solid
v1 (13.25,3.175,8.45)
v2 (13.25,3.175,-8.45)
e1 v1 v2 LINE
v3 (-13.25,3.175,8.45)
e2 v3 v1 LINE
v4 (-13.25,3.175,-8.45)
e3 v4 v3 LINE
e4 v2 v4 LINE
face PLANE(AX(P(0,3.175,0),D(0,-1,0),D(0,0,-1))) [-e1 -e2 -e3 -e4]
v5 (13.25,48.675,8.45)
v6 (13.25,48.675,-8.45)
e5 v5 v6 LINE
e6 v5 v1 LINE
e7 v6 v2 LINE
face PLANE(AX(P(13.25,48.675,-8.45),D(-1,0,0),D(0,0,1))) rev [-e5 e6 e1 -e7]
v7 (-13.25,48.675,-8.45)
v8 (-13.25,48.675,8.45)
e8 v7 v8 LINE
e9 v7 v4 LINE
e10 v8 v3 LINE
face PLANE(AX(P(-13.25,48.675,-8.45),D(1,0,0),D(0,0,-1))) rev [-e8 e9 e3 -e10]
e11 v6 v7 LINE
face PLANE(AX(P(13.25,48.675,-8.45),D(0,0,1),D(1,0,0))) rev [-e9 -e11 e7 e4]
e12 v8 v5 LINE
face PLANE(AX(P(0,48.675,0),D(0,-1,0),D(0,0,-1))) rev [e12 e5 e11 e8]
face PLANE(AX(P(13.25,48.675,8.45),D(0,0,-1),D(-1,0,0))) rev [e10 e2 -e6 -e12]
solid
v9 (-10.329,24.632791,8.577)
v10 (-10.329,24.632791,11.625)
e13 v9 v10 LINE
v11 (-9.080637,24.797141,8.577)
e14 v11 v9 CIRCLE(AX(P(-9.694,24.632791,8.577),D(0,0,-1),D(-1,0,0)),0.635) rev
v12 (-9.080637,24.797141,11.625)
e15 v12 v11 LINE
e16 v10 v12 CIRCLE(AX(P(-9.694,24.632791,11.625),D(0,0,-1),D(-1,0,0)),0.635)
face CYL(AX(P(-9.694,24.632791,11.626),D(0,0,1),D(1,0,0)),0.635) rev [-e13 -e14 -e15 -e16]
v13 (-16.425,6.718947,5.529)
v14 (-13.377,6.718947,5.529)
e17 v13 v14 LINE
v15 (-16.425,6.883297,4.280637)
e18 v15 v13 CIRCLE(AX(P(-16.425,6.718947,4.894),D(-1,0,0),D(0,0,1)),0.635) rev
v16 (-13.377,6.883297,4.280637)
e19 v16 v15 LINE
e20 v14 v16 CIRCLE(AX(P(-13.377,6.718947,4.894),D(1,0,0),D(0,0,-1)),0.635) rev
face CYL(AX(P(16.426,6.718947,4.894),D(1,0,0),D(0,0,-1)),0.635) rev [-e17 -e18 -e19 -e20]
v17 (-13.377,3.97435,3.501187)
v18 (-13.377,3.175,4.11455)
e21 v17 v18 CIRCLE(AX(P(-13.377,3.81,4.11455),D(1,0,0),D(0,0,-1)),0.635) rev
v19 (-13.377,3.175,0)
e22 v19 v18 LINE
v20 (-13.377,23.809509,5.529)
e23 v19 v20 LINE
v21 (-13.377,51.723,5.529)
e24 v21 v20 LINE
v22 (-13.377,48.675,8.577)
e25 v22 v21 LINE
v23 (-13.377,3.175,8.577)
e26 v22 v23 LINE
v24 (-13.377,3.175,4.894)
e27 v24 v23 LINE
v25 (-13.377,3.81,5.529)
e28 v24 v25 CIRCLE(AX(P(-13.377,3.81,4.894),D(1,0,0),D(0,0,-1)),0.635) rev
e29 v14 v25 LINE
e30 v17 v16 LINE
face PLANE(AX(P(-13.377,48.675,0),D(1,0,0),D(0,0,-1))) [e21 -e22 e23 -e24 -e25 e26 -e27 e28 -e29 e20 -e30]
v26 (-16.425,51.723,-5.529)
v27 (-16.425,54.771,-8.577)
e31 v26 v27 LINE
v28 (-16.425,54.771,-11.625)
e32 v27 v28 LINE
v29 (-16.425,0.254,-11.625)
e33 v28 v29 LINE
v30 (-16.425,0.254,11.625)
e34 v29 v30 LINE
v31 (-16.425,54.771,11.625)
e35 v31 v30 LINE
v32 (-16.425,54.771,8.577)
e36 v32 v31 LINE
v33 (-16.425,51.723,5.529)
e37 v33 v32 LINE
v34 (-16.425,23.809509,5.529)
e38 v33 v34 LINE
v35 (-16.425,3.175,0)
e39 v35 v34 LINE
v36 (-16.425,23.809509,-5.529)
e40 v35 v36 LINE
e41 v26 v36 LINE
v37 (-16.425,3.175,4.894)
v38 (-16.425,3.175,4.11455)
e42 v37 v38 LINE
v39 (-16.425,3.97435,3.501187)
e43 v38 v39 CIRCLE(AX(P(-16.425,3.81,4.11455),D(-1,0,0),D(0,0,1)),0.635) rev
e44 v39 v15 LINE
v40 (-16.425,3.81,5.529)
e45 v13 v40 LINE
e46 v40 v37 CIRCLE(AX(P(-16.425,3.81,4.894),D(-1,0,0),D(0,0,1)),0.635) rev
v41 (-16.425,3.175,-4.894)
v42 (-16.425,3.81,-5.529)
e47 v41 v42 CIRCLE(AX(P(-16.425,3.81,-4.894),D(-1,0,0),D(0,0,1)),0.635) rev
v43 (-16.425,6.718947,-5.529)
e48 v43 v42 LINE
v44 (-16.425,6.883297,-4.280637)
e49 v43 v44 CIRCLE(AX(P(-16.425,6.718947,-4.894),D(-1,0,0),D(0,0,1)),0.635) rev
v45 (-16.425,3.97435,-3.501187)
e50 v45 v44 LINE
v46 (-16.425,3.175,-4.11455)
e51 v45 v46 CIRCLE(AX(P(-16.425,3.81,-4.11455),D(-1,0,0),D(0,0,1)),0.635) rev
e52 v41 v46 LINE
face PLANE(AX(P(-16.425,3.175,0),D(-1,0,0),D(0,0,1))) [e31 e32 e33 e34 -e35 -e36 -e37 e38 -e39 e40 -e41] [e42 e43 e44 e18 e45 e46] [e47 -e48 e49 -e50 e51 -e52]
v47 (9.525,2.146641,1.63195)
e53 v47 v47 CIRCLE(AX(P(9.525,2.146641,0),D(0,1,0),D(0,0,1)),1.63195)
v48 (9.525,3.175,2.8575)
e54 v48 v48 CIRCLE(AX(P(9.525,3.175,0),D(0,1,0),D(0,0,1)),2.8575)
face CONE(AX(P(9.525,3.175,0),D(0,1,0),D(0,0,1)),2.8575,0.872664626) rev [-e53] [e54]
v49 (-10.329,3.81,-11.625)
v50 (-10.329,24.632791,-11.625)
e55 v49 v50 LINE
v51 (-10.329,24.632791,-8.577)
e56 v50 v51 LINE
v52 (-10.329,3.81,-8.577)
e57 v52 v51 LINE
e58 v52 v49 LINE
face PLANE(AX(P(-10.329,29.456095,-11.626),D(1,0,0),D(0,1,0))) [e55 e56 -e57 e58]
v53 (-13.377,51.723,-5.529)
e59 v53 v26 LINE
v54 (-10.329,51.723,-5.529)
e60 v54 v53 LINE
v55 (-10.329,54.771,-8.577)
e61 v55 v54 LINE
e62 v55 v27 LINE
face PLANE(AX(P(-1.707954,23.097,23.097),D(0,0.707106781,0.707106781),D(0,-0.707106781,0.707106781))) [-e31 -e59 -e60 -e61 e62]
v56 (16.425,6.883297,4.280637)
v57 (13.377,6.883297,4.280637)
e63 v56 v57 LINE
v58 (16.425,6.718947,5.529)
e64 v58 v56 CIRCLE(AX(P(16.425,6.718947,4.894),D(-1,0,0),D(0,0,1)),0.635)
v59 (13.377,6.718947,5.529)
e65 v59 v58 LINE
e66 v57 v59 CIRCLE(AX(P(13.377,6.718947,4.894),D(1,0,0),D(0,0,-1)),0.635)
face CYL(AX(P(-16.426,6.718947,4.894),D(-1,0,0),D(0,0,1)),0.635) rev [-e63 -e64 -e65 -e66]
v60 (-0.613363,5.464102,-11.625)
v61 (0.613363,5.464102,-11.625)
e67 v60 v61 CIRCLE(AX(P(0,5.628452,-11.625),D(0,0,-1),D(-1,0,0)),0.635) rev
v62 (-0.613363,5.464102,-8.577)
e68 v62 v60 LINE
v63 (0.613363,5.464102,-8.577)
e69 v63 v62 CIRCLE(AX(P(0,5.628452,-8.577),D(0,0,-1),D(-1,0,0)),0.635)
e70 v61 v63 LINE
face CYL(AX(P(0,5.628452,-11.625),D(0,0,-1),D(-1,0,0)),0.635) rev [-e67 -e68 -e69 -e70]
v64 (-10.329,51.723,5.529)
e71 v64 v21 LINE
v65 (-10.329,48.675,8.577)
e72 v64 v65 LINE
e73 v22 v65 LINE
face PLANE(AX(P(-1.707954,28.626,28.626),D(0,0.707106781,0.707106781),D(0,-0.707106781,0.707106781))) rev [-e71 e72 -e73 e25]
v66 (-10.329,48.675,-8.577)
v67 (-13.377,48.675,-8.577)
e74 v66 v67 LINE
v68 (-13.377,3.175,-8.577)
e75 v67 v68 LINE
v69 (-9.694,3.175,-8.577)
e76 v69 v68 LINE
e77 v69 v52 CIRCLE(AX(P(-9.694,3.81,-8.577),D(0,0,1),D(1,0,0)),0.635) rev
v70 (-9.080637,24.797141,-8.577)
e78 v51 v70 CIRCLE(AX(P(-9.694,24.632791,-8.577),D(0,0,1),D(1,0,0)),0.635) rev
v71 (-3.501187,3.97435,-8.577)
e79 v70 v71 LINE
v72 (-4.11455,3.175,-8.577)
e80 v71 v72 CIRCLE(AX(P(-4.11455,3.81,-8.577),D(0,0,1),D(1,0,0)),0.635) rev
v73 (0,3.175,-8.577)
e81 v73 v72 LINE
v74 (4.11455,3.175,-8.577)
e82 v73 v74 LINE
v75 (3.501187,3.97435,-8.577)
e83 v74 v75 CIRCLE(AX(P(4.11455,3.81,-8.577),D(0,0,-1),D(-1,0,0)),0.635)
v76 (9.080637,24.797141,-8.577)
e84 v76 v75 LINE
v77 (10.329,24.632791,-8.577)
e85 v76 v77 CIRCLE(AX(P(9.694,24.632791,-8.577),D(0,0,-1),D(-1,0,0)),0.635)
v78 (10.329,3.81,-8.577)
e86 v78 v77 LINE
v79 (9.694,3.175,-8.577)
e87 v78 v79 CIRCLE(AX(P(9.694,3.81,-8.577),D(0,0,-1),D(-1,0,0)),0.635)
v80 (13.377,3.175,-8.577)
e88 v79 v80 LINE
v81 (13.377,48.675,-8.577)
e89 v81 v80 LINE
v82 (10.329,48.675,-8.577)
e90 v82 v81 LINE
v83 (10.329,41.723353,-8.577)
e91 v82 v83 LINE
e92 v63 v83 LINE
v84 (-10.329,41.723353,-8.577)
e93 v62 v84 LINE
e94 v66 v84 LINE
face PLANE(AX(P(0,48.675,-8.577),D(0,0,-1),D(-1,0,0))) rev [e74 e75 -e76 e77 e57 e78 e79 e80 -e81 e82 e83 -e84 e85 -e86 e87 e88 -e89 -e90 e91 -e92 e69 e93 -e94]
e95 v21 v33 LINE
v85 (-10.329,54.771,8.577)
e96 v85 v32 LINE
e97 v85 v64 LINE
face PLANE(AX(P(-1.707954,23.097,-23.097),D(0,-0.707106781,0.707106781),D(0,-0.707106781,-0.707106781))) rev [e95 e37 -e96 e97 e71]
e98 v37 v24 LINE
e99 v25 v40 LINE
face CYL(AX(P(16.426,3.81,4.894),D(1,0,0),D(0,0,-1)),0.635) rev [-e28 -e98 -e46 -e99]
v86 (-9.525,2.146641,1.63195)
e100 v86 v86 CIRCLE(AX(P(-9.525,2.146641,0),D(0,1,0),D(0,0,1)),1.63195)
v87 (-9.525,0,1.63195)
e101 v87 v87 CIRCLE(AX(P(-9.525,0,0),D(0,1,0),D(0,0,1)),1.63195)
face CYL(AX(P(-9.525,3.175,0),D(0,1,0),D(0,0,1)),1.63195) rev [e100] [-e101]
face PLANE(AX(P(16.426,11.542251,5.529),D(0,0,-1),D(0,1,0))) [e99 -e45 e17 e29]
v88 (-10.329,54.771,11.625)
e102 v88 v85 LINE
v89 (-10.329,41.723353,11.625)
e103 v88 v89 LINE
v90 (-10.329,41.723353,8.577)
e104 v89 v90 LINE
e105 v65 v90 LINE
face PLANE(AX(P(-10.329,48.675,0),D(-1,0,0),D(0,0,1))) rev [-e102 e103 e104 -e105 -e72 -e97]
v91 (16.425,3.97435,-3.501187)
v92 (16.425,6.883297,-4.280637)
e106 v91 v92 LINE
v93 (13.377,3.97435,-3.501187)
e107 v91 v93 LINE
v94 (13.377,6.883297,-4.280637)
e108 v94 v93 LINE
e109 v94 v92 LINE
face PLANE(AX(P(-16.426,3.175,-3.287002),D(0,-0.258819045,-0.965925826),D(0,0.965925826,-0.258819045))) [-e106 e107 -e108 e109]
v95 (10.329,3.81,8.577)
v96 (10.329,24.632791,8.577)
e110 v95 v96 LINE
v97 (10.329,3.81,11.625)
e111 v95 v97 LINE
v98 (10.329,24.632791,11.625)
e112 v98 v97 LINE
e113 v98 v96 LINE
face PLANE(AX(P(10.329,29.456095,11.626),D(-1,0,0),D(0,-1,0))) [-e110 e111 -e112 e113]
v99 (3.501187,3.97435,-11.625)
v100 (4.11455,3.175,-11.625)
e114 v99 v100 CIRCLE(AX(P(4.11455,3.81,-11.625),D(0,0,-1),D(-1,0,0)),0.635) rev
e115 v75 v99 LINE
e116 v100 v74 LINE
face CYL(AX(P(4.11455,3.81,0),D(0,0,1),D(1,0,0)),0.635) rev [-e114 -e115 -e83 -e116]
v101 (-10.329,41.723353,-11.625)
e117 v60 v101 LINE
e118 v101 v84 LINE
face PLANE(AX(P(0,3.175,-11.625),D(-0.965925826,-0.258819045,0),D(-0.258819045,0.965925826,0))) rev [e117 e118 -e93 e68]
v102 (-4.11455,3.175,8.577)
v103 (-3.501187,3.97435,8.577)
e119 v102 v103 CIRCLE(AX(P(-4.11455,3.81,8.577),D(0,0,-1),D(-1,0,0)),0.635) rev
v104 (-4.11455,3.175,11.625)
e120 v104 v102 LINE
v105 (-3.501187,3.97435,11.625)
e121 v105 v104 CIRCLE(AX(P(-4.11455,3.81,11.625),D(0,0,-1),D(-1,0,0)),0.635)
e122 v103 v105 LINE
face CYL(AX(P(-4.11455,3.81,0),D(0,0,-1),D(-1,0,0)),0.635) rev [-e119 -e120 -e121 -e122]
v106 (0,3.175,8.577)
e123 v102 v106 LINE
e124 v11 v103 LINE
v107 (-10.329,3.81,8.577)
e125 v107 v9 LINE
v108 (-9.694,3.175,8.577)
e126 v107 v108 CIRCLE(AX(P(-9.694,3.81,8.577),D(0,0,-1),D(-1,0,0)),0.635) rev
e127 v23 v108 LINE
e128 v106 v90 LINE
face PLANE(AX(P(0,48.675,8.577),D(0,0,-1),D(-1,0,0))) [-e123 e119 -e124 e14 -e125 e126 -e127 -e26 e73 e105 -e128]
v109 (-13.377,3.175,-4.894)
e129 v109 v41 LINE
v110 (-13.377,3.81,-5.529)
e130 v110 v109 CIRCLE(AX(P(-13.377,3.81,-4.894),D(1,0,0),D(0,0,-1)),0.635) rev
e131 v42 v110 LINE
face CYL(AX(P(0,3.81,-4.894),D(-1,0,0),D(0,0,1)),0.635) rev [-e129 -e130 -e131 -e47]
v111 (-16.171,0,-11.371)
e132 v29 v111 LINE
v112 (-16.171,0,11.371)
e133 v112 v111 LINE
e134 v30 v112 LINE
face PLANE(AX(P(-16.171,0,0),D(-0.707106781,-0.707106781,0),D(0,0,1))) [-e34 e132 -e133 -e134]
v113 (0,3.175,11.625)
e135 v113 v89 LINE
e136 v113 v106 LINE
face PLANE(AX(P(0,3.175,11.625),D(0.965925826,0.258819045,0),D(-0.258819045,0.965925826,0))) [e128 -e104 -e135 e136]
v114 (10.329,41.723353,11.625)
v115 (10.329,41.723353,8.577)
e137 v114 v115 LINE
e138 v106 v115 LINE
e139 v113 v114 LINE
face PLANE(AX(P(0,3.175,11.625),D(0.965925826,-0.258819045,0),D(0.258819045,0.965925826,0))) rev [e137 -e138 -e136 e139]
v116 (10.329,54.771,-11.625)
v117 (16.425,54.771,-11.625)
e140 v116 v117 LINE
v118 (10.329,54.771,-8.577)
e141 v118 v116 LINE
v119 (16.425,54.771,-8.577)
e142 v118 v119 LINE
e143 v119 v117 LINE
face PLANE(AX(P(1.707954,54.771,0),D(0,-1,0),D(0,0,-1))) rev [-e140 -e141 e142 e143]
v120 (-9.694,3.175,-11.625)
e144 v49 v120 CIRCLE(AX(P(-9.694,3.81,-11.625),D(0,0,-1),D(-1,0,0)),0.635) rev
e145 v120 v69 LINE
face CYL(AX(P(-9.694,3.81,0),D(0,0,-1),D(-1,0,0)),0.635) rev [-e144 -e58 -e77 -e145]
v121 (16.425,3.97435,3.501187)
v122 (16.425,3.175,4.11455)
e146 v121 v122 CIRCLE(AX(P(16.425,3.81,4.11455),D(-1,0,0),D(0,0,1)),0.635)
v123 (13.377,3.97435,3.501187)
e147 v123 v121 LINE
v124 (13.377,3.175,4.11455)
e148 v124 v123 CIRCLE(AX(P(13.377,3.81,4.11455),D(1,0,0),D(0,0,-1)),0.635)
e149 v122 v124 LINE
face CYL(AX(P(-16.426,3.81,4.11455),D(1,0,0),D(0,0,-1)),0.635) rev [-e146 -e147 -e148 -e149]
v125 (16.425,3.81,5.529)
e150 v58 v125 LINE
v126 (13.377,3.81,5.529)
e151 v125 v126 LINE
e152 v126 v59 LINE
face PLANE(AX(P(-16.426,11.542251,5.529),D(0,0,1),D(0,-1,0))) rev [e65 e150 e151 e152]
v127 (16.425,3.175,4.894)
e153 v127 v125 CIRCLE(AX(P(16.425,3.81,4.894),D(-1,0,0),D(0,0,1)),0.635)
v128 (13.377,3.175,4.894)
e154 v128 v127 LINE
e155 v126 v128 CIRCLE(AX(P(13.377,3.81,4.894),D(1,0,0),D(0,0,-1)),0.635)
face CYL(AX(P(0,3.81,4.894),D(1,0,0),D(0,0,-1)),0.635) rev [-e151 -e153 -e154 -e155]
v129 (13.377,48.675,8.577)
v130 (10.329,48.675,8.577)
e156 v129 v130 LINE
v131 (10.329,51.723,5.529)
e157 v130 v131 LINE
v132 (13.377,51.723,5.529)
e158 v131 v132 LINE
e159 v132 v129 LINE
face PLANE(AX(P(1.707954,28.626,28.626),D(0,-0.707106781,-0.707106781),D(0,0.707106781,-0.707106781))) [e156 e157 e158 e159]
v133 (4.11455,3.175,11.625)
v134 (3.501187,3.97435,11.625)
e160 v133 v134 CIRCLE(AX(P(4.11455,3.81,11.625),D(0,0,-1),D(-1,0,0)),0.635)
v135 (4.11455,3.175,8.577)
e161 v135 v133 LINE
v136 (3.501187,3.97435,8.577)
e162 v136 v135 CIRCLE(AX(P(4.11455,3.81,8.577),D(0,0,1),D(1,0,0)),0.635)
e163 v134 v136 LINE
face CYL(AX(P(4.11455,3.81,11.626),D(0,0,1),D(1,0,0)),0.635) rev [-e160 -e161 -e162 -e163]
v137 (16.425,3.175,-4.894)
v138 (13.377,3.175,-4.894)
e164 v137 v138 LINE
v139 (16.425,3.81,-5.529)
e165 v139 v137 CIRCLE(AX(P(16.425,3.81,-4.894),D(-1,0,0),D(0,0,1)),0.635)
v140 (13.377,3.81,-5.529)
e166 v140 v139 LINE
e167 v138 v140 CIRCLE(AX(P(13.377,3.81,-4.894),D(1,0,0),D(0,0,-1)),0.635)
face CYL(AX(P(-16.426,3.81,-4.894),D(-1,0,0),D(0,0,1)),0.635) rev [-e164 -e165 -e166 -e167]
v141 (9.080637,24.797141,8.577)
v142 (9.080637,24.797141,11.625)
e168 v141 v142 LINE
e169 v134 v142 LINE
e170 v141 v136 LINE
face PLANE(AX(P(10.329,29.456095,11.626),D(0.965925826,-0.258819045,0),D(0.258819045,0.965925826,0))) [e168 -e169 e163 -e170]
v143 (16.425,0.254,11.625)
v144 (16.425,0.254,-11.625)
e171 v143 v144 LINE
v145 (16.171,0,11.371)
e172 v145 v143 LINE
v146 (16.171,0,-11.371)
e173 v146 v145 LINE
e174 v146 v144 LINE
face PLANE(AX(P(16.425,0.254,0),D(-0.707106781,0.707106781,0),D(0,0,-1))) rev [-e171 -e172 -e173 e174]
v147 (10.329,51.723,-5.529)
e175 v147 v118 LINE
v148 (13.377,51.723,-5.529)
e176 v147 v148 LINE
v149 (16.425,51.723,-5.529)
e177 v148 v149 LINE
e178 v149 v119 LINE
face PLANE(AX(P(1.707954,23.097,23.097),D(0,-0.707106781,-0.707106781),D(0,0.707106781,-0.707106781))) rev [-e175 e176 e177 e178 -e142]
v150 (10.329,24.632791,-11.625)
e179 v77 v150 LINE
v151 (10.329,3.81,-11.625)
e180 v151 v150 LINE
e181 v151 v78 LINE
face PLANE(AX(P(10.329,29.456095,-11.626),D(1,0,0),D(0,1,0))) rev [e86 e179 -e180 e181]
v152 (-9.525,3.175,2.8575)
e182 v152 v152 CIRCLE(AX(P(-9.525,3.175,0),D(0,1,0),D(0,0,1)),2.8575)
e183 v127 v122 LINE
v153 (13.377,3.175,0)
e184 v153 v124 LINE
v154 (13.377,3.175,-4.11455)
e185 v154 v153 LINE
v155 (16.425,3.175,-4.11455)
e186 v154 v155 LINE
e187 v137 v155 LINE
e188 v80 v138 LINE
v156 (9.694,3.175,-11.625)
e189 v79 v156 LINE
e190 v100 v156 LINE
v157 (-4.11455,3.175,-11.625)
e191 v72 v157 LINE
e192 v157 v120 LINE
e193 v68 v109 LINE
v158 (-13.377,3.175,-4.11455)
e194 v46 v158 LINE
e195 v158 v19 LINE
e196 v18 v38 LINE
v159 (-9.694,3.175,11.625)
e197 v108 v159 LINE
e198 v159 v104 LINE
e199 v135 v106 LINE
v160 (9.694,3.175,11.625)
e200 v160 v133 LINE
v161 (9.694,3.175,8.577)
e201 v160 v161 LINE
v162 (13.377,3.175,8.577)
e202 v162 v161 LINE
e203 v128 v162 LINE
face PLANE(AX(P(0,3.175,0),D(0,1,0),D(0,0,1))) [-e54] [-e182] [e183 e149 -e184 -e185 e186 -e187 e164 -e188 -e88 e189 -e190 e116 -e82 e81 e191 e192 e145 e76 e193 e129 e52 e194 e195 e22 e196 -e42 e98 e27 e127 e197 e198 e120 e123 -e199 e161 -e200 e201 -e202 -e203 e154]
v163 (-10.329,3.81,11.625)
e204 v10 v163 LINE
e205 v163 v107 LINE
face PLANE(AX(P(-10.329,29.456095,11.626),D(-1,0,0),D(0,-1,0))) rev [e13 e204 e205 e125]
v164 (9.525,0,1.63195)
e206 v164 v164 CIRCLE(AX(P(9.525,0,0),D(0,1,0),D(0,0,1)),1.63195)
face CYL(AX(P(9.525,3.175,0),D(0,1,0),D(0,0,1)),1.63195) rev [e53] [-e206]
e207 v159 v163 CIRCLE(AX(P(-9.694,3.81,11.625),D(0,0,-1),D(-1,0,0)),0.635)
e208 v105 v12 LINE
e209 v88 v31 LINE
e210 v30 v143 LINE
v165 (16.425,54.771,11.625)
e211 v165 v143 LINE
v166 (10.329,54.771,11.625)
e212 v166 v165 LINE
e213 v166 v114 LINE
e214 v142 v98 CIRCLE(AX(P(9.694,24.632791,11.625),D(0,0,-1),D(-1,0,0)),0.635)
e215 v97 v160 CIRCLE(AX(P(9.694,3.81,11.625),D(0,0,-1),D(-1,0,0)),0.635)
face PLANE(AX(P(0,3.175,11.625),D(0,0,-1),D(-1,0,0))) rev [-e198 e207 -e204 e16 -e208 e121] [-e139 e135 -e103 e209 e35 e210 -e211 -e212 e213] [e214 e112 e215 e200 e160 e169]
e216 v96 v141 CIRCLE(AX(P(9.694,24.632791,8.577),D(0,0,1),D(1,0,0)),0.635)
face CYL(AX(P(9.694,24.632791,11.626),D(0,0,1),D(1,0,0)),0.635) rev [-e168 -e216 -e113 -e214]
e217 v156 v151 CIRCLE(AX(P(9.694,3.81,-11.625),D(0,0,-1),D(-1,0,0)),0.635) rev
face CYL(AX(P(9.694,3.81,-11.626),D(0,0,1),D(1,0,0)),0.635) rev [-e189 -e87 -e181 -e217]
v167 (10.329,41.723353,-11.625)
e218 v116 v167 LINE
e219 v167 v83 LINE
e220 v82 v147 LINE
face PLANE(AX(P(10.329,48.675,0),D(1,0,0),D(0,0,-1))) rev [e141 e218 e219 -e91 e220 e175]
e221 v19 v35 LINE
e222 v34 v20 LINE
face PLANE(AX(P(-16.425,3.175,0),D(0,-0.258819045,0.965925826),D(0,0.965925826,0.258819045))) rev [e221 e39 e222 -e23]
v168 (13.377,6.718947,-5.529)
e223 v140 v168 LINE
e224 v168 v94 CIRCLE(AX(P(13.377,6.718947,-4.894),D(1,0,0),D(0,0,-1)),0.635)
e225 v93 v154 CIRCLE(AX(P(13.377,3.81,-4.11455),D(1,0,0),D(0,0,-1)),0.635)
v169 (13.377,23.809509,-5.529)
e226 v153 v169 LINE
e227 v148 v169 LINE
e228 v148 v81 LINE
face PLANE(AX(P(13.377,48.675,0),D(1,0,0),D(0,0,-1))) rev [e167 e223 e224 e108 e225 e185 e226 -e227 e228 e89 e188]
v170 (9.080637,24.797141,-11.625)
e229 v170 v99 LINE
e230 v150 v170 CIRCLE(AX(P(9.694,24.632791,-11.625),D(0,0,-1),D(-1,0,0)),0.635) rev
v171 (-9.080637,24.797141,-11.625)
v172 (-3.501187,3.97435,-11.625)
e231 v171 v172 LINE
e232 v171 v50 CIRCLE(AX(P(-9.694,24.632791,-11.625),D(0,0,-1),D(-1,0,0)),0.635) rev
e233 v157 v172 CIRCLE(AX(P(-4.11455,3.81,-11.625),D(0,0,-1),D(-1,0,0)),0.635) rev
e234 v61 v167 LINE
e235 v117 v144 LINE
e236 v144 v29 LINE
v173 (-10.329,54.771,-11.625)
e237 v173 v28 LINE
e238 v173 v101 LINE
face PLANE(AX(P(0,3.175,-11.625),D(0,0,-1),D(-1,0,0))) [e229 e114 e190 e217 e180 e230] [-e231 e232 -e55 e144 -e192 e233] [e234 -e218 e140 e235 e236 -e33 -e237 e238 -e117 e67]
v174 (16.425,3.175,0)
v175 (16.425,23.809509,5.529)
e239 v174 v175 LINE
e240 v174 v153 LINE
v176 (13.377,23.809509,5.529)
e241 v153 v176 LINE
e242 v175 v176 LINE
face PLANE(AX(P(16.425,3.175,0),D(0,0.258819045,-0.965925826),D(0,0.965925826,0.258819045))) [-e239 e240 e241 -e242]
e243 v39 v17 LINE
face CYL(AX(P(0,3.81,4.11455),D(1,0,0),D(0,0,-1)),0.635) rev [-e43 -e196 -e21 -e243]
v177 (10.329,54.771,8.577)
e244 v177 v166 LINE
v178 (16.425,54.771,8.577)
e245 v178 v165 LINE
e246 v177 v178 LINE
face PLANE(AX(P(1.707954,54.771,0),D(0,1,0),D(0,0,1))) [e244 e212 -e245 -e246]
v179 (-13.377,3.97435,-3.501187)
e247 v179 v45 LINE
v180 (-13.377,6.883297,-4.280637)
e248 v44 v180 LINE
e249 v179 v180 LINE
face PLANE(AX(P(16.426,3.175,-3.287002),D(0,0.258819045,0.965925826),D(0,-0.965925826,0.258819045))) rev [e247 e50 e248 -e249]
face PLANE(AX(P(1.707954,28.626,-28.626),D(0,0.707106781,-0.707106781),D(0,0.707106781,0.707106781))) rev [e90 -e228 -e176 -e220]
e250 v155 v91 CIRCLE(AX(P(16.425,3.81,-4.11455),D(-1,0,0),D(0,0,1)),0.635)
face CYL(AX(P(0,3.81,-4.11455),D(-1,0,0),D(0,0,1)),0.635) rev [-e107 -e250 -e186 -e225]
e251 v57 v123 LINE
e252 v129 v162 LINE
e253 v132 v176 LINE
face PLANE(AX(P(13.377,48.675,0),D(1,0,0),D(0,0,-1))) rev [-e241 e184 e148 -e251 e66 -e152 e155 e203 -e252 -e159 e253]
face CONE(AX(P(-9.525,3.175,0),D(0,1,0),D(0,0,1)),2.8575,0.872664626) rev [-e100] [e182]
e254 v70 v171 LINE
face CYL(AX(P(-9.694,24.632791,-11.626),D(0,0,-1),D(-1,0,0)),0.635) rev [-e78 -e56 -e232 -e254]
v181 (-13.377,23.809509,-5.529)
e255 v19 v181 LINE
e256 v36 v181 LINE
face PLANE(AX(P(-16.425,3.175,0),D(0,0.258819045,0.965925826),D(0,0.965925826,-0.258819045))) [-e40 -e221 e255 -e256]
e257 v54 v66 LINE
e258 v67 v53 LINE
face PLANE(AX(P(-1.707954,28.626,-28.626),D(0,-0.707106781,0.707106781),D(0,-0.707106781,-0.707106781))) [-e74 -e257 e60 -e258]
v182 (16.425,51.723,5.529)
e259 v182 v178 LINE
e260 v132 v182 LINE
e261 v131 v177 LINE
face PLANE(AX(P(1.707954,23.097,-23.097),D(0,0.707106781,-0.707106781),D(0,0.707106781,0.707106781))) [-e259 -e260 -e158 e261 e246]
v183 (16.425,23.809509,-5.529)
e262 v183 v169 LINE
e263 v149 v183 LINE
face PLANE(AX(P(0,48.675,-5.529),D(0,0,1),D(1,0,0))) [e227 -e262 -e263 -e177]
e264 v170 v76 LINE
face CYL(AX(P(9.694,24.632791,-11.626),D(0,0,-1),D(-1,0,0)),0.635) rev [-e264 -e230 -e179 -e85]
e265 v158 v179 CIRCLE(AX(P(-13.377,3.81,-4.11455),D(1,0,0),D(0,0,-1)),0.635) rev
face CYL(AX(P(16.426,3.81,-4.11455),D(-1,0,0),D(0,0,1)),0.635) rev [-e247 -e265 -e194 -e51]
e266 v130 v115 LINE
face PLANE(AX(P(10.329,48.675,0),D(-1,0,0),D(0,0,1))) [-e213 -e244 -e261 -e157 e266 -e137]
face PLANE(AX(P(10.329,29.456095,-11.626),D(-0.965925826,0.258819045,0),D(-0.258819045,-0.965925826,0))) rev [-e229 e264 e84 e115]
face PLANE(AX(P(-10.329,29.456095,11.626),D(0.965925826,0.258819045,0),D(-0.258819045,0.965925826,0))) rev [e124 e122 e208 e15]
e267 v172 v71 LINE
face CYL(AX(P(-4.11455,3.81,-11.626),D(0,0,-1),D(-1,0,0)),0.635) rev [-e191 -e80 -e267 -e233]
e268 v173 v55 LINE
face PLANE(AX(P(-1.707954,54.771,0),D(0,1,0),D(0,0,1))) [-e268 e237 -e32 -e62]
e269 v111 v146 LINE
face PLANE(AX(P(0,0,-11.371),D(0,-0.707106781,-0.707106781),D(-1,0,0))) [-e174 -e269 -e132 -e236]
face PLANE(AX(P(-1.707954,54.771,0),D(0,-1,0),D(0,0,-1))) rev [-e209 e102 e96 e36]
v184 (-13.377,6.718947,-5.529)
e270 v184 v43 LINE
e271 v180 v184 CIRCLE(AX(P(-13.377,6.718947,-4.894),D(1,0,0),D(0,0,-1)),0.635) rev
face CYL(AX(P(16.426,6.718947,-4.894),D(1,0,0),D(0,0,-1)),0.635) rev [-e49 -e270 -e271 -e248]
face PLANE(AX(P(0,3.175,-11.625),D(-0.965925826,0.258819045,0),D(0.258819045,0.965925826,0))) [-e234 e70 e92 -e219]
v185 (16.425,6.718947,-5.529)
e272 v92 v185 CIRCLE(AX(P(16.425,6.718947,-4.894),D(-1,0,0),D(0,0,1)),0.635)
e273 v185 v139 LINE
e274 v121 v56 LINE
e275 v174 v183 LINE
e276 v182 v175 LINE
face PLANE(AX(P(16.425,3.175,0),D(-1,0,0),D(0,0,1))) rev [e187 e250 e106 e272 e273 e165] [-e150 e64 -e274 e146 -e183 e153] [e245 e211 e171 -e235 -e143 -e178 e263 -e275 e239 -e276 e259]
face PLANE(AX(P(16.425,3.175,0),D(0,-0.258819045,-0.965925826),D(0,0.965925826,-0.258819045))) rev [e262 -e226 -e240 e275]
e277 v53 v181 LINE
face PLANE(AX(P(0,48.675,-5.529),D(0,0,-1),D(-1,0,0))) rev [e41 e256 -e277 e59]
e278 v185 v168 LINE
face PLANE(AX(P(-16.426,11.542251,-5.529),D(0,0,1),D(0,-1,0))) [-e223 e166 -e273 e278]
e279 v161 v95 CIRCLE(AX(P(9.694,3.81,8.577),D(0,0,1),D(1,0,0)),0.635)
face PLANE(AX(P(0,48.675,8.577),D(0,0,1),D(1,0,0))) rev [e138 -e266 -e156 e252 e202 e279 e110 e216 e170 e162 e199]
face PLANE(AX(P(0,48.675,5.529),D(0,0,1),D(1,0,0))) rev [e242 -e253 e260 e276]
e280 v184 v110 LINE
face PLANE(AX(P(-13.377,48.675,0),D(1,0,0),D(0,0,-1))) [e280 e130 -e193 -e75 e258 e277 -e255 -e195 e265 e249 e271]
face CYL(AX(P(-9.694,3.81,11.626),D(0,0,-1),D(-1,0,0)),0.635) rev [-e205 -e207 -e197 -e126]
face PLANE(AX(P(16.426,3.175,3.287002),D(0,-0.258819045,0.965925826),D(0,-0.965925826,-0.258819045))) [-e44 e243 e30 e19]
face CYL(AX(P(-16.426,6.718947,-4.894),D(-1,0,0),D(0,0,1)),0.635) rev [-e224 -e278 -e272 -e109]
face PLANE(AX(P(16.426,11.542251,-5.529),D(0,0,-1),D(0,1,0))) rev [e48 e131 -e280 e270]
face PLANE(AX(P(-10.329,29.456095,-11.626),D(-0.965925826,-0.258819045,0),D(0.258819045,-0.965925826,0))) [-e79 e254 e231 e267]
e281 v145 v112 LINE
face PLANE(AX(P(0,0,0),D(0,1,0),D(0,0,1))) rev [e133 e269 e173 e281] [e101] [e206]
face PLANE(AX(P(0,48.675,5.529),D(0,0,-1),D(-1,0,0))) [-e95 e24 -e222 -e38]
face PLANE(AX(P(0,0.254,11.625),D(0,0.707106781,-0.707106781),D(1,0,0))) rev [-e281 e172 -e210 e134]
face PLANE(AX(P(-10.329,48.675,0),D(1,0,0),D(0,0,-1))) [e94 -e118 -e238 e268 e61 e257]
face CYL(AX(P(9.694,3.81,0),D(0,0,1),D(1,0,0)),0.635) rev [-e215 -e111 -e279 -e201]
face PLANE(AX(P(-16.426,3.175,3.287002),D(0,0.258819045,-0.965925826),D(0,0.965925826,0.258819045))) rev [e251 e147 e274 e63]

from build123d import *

# Parameters (mm, degrees)
SKETCH1_W                                 = 32.850000086
SKETCH1_H                                 = 23.249999982
BOSS_EXTRUDE1_DEPTH                       = 3.175
SKETCH2_W                                 = 26.500000086
SKETCH2_H                                 = 16.899999982
BATTERY_DEPTH                             = 45.499999932
CSK_FOR_4_FLAT_HEAD_MACHINE_SCREW_2_COUNT = 2
CSK_FOR_4_FLAT_HEAD_MACHINE_SCREW_2_PITCH = 19.05
BOSS_EXTRUDE4_DEPTH                       = 45.499999932
RIB1_START                                = -3.048
RIB1_DEPTH                                = 3.048
CUT_EXTRUDE1_DEPTH                        = 3.048
MIRROR2_START                             = -3.048
MIRROR2_COPY_1_DEPTH                      = 3.048
MIRROR2_COPY_2_DEPTH                      = 3.048
BOSS_EXTRUDE5_REACH                       = 61.862
BOSS_EXTRUDE6_DEPTH                       = 3.048
BOSS_EXTRUDE7_DEPTH                       = 6.096
BOSS_EXTRUDE8_DEPTH                       = 3.048
RIB4_REACH                                = 66.916
SKETCH22_WALL_W                           = 153.195008736
SKETCH22_WALL_H                           = 3.048
CUT_EXTRUDE2_DEPTH                        = 3.048
MIRROR7_COPY_1_REACH                      = 66.916
MIRROR7_COPY_1_SKETCH_W                   = 153.195008736
MIRROR7_COPY_1_SKETCH_H                   = 3.048
MIRROR7_COPY_2_DEPTH                      = 3.048
FILLET2_R                                 = 0.635
CHAMFER_FOR_ELEPHANT_S_FOOT_SIZE          = 0.254


# Read off the part's stored shape, not the designer's step: Rib1
with BuildPart() as part:
    # Sketch1 → Boss-Extrude1 (new body)
    with BuildSketch(Plane(origin=(0, 0, 0), x_dir=(1, 0, 0), z_dir=(0, 1, 0))):
        Rectangle(SKETCH1_W, SKETCH1_H)
    extrude(amount=BOSS_EXTRUDE1_DEPTH)

    # Sketch13 → CSK for _4 Flat Head Machine Screw _100 (revolve, cut)
    with BuildSketch(Plane(origin=(-9.525, 3.175, 0), x_dir=(0, 0, 1), z_dir=(1, 0, 0))):
        Polygon((0, 0), (0, 3.175), (1.63195, 3.175), (1.63195, 1.028358553), (2.8575, 0), align=None)
    csk_for_4_flat_head_machine_screw_100 = revolve(axis=Axis((-9.525, 9.525, 0), (0, -1, 0)), mode=Mode.SUBTRACT)

    # CSK for _4 Flat Head Machine Screw _ 2: CSK for _4 Flat Head Machine Screw _100 ×2
    with Locations(*[(i * CSK_FOR_4_FLAT_HEAD_MACHINE_SCREW_2_PITCH, 0, 0) for i in range(1, CSK_FOR_4_FLAT_HEAD_MACHINE_SCREW_2_COUNT)]):
        add(csk_for_4_flat_head_machine_screw_100, mode=Mode.SUBTRACT)

    # Sketch14 → Boss-Extrude4 (add)
    with BuildSketch(Plane(origin=(0, 3.175, 0), x_dir=(1, 0, 0), z_dir=(0, 1, 0))):
        Polygon((16.425000043, -11.624999991), (16.425000043, -5.528999991), (13.377000043, -5.528999991), (13.377000043, -8.576999991), (10.329000043, -8.576999991), (10.329000043, -11.624999991), align=None)
        Polygon((13.377000043, 8.576999991), (13.377000043, 5.528999991), (16.425000043, 5.528999991), (16.425000043, 11.624999991), (10.329000043, 11.624999991), (10.329000043, 8.576999991), align=None)
        Polygon((-10.329000043, 8.576999991), (-10.329000043, 11.624999991), (-16.425000043, 11.624999991), (-16.425000043, 5.528999991), (-13.377000043, 5.528999991), (-13.377000043, 8.576999991), align=None)
        Polygon((-16.425000043, -11.624999991), (-10.329000043, -11.624999991), (-10.329000043, -8.576999991), (-13.377000043, -8.576999991), (-13.377000043, -5.528999991), (-16.425000043, -5.528999991), align=None)
    extrude(amount=BOSS_EXTRUDE4_DEPTH)

    # Rib1 outline → Rib1 (add)
    with BuildSketch(Plane.XY.offset(11.624999991).offset(RIB1_START)):
        Polygon((-10.329000043, 3.175), (0, 3.175), (-10.329000043, 41.723352952), align=None)
    rib1 = extrude(amount=RIB1_DEPTH)

    # Sketch18 → Cut-Extrude1 (cut)
    with BuildSketch(Plane(origin=(0, 0, 8.576999991), x_dir=(-1, 0, 0), z_dir=(0, 0, -1))):
        Polygon((10.329000043, 29.456094958), (10.329000043, 3.175), (3.287001873, 3.175), align=None)
    cut_extrude1 = extrude(amount=-CUT_EXTRUDE1_DEPTH, mode=Mode.SUBTRACT)

    # Mirror1: Rib1, Cut-Extrude1 across plane
    add(rib1.mirror(Plane.XY))
    add(cut_extrude1.mirror(Plane.XY), mode=Mode.SUBTRACT)

    # Mirror2: Rib1, Cut-Extrude1 across plane
    add(rib1.mirror(Plane(origin=(0, 0, 0), x_dir=(0, 0, 1), z_dir=(1, 0, 0))))
    add(cut_extrude1.mirror(Plane(origin=(0, 0, 0), x_dir=(0, 0, 1), z_dir=(1, 0, 0))), mode=Mode.SUBTRACT)

    # Mirror2 copy 1 sketch → Mirror2 copy 1 (add)
    with BuildSketch(Plane(origin=(0, 0, -11.624999991), x_dir=(-1, 0, 0), z_dir=(0, 0, -1)).offset(MIRROR2_START)):
        Polygon((-10.329000043, 3.175), (0, 3.175), (-10.329000043, 41.723352952), align=None)
    extrude(amount=MIRROR2_COPY_1_DEPTH)

    # Mirror2 copy 2 sketch → Mirror2 copy 2 (cut)
    with BuildSketch(Plane.XY.offset(-8.576999991)):
        Polygon((10.329000043, 29.456094958), (10.329000043, 3.175), (3.287001873, 3.175), align=None)
    extrude(amount=-MIRROR2_COPY_2_DEPTH, mode=Mode.SUBTRACT)

    # Boss-Extrude5: up to this face of the body (flat: up to its plane)
    boss_extrude5_end = Plane(part.part.faces().sort_by_distance((10.329000043, 45.199176442, 10.100999991))[0])
    # Sketch19 → Boss-Extrude5 (add, up to the picked face)
    with BuildSketch(Plane.ZY.offset(-16.425000043), mode=Mode.PRIVATE) as boss_extrude5_sk1:
        Polygon((5.528999991, 51.722999932), (8.576999991, 48.674999932), (11.624999991, 48.674999932), (11.624999991, 51.722999932), align=None)
    boss_extrude5_tool1 = split(extrude(boss_extrude5_sk1.sketch, amount=BOSS_EXTRUDE5_REACH, mode=Mode.PRIVATE), bisect_by=boss_extrude5_end, keep=Keep.BOTH, mode=Mode.PRIVATE)
    # Sketch19 → Boss-Extrude5 (add, up to the picked face)
    with BuildSketch(Plane.ZY.offset(-16.425000043), mode=Mode.PRIVATE) as boss_extrude5_sk2:
        Polygon((8.576999991, 54.770999932), (5.528999991, 51.722999932), (11.624999991, 51.722999932), (11.624999991, 54.770999932), align=None)
    boss_extrude5_tool2 = split(extrude(boss_extrude5_sk2.sketch, amount=BOSS_EXTRUDE5_REACH, mode=Mode.PRIVATE), bisect_by=boss_extrude5_end, keep=Keep.BOTH, mode=Mode.PRIVATE)
    boss_extrude5_1 = boss_extrude5_tool1.solids().sort_by(Axis((16.425, 50.368333, 9.254333), (-1, 0, 0)))[0]
    add(boss_extrude5_1)
    boss_extrude5_2 = boss_extrude5_tool2.solids().sort_by(Axis((16.425, 53.077667, 9.254333), (-1, 0, 0)))[0]
    add(boss_extrude5_2)
    boss_extrude5 = boss_extrude5_1 + boss_extrude5_2  # Boss-Extrude5 as one shape, for the pattern or mirror that repeats it

    # Sketch19<3> → Boss-Extrude6 (add)
    with BuildSketch(Plane.ZY.offset(-16.425000043)):
        Polygon((5.528999991, 48.674999932), (8.576999991, 48.674999932), (5.528999991, 51.722999932), align=None)
    boss_extrude6 = extrude(amount=BOSS_EXTRUDE6_DEPTH)

    # Sketch20 → Boss-Extrude7 (add)
    with BuildSketch(Plane.ZY.offset(16.425000043)):
        Polygon((8.576999991, 54.770999932), (5.528999991, 51.722999932), (8.576999991, 48.674999932), (11.624999991, 48.674999932), (11.624999991, 54.770999932), align=None)
    boss_extrude7 = extrude(amount=-BOSS_EXTRUDE7_DEPTH)

    # Sketch20<3> → Boss-Extrude8 (add)
    with BuildSketch(Plane.ZY.offset(16.425000043)):
        Polygon((5.528999991, 51.722999932), (5.528999991, 48.674999932), (8.576999991, 48.674999932), align=None)
    boss_extrude8 = extrude(amount=-BOSS_EXTRUDE8_DEPTH)

    # Mirror3: Boss-Extrude5, Boss-Extrude6, Boss-Extrude7, Boss-Extrude8 across plane
    add(boss_extrude5.mirror(Plane.XY))
    add(boss_extrude6.mirror(Plane.XY))
    add(boss_extrude7.mirror(Plane.XY))
    add(boss_extrude8.mirror(Plane.XY))

    # Sketch22 wall → Rib4 (add, up to next)
    with BuildSketch(Plane(origin=(16.425000043, 13.492254441, 2.764499996), x_dir=(0, 0.965925826288, 0.258819045108), z_dir=(0, -0.258819045108, 0.965925826288)), mode=Mode.PRIVATE) as rib4_sk1:
        with Locations((0, 1.524)):
            Rectangle(SKETCH22_WALL_W, SKETCH22_WALL_H)
    rib4_tool1 = extrude(rib4_sk1.sketch, amount=RIB4_REACH, mode=Mode.PRIVATE) - part.part
    rib4 = rib4_tool1.solids().sort_by_distance((16.425000043, 13.492254441, 2.764499996))[0]
    add(rib4)

    # Sketch23 → Cut-Extrude2 (cut)
    with BuildSketch(Plane(origin=(16.425000043, 0, 0), x_dir=(0, 0, -1), z_dir=(1, 0, 0))):
        Polygon((-5.528999991, 3.175), (-3.287001873, 3.175), (-5.528999991, 11.542250888), align=None)
    cut_extrude2 = extrude(amount=-CUT_EXTRUDE2_DEPTH, mode=Mode.SUBTRACT)

    # Mirror6: Rib4, Cut-Extrude2 across plane
    add(rib4.mirror(Plane(origin=(0, 0, 0), x_dir=(0, 0, 1), z_dir=(1, 0, 0))))
    add(cut_extrude2.mirror(Plane(origin=(0, 0, 0), x_dir=(0, 0, 1), z_dir=(1, 0, 0))), mode=Mode.SUBTRACT)

    # Mirror7: Rib4, Cut-Extrude2 across plane
    add(rib4.mirror(Plane.XY))
    add(cut_extrude2.mirror(Plane.XY), mode=Mode.SUBTRACT)

    # Mirror7 copy 1 sketch → Mirror7 copy 1 (add, up to next)
    with BuildSketch(Plane(origin=(-16.425000043, 13.492254441, -2.764499996), x_dir=(0, 0.965925826288, -0.258819045108), z_dir=(0, -0.258819045108, -0.965925826288)), mode=Mode.PRIVATE) as mirror7_copy_1_sk1:
        with Locations((0, 1.524)):
            Rectangle(MIRROR7_COPY_1_SKETCH_W, MIRROR7_COPY_1_SKETCH_H)
    mirror7_copy_1_tool1 = extrude(mirror7_copy_1_sk1.sketch, amount=MIRROR7_COPY_1_REACH, mode=Mode.PRIVATE) - part.part
    add(mirror7_copy_1_tool1.solids().sort_by_distance((-16.425000043, 13.492254441, -2.764499996))[0])

    # Mirror7 copy 2 sketch → Mirror7 copy 2 (cut)
    with BuildSketch(Plane.ZY.offset(16.425000043)):
        Polygon((-5.528999991, 3.175), (-3.287001873, 3.175), (-5.528999991, 11.542250888), align=None)
    extrude(amount=-MIRROR7_COPY_2_DEPTH, mode=Mode.SUBTRACT)

    # Fillet2
    fillet2_edges = [part.edges().sort_by_distance(p)[0] for p in [
        (-3.287001873, 3.175, 10.100999991),
        (-10.329000043, 29.456094958, 10.100999991),
        (-10.329000043, 3.175, 10.100999991),
        (0, 3.175, -10.100999991),
        (-10.329000043, 29.456094958, -10.100999991),
        (-3.287001873, 3.175, -10.100999991),
        (-10.329000043, 3.175, -10.100999991),
        (10.329000043, 29.456094958, 10.100999991),
        (3.287001873, 3.175, 10.100999991),
        (10.329000043, 3.175, 10.100999991),
        (3.287001873, 3.175, -10.100999991),
        (10.329000043, 29.456094958, -10.100999991),
        (10.329000043, 3.175, -10.100999991),
        (14.901000043, 3.175, 5.528999991),
        (14.901000043, 11.542250888, 5.528999991),
        (14.901000043, 3.175, 3.287001873),
        (-14.901000043, 11.542250888, 5.528999991),
        (-14.901000043, 3.175, 5.528999991),
        (-14.901000043, 3.175, 3.287001873),
        (-14.901000043, 3.175, -5.528999991),
        (-14.901000043, 11.542250888, -5.528999991),
        (-14.901000043, 3.175, -3.287001873),
        (14.901000043, 11.542250888, -5.528999991),
        (14.901000043, 3.175, -5.528999991),
        (14.901000043, 3.175, -3.287001873),
    ]]
    fillet(fillet2_edges, radius=FILLET2_R)

    # Chamfer for Elephant's foot
    chamfer_for_elephant_s_foot_edges = [part.edges().sort_by_distance(p)[0] for p in [
        (0, 0, -11.624999991),
        (16.425000043, 0, 0),
        (0, 0, 11.624999991),
        (-16.425000043, 0, 0),
    ]]
    chamfer(chamfer_for_elephant_s_foot_edges, length=CHAMFER_FOR_ELEPHANT_S_FOOT_SIZE)


with BuildPart() as body_2:
    # Sketch2 → Battery (new body)
    with BuildSketch(Plane(origin=(0, 3.175, 0), x_dir=(1, 0, 0), z_dir=(0, 1, 0))):
        Rectangle(SKETCH2_W, SKETCH2_H)
    extrude(amount=BATTERY_DEPTH)


solid = Compound([part.part, body_2.part])
